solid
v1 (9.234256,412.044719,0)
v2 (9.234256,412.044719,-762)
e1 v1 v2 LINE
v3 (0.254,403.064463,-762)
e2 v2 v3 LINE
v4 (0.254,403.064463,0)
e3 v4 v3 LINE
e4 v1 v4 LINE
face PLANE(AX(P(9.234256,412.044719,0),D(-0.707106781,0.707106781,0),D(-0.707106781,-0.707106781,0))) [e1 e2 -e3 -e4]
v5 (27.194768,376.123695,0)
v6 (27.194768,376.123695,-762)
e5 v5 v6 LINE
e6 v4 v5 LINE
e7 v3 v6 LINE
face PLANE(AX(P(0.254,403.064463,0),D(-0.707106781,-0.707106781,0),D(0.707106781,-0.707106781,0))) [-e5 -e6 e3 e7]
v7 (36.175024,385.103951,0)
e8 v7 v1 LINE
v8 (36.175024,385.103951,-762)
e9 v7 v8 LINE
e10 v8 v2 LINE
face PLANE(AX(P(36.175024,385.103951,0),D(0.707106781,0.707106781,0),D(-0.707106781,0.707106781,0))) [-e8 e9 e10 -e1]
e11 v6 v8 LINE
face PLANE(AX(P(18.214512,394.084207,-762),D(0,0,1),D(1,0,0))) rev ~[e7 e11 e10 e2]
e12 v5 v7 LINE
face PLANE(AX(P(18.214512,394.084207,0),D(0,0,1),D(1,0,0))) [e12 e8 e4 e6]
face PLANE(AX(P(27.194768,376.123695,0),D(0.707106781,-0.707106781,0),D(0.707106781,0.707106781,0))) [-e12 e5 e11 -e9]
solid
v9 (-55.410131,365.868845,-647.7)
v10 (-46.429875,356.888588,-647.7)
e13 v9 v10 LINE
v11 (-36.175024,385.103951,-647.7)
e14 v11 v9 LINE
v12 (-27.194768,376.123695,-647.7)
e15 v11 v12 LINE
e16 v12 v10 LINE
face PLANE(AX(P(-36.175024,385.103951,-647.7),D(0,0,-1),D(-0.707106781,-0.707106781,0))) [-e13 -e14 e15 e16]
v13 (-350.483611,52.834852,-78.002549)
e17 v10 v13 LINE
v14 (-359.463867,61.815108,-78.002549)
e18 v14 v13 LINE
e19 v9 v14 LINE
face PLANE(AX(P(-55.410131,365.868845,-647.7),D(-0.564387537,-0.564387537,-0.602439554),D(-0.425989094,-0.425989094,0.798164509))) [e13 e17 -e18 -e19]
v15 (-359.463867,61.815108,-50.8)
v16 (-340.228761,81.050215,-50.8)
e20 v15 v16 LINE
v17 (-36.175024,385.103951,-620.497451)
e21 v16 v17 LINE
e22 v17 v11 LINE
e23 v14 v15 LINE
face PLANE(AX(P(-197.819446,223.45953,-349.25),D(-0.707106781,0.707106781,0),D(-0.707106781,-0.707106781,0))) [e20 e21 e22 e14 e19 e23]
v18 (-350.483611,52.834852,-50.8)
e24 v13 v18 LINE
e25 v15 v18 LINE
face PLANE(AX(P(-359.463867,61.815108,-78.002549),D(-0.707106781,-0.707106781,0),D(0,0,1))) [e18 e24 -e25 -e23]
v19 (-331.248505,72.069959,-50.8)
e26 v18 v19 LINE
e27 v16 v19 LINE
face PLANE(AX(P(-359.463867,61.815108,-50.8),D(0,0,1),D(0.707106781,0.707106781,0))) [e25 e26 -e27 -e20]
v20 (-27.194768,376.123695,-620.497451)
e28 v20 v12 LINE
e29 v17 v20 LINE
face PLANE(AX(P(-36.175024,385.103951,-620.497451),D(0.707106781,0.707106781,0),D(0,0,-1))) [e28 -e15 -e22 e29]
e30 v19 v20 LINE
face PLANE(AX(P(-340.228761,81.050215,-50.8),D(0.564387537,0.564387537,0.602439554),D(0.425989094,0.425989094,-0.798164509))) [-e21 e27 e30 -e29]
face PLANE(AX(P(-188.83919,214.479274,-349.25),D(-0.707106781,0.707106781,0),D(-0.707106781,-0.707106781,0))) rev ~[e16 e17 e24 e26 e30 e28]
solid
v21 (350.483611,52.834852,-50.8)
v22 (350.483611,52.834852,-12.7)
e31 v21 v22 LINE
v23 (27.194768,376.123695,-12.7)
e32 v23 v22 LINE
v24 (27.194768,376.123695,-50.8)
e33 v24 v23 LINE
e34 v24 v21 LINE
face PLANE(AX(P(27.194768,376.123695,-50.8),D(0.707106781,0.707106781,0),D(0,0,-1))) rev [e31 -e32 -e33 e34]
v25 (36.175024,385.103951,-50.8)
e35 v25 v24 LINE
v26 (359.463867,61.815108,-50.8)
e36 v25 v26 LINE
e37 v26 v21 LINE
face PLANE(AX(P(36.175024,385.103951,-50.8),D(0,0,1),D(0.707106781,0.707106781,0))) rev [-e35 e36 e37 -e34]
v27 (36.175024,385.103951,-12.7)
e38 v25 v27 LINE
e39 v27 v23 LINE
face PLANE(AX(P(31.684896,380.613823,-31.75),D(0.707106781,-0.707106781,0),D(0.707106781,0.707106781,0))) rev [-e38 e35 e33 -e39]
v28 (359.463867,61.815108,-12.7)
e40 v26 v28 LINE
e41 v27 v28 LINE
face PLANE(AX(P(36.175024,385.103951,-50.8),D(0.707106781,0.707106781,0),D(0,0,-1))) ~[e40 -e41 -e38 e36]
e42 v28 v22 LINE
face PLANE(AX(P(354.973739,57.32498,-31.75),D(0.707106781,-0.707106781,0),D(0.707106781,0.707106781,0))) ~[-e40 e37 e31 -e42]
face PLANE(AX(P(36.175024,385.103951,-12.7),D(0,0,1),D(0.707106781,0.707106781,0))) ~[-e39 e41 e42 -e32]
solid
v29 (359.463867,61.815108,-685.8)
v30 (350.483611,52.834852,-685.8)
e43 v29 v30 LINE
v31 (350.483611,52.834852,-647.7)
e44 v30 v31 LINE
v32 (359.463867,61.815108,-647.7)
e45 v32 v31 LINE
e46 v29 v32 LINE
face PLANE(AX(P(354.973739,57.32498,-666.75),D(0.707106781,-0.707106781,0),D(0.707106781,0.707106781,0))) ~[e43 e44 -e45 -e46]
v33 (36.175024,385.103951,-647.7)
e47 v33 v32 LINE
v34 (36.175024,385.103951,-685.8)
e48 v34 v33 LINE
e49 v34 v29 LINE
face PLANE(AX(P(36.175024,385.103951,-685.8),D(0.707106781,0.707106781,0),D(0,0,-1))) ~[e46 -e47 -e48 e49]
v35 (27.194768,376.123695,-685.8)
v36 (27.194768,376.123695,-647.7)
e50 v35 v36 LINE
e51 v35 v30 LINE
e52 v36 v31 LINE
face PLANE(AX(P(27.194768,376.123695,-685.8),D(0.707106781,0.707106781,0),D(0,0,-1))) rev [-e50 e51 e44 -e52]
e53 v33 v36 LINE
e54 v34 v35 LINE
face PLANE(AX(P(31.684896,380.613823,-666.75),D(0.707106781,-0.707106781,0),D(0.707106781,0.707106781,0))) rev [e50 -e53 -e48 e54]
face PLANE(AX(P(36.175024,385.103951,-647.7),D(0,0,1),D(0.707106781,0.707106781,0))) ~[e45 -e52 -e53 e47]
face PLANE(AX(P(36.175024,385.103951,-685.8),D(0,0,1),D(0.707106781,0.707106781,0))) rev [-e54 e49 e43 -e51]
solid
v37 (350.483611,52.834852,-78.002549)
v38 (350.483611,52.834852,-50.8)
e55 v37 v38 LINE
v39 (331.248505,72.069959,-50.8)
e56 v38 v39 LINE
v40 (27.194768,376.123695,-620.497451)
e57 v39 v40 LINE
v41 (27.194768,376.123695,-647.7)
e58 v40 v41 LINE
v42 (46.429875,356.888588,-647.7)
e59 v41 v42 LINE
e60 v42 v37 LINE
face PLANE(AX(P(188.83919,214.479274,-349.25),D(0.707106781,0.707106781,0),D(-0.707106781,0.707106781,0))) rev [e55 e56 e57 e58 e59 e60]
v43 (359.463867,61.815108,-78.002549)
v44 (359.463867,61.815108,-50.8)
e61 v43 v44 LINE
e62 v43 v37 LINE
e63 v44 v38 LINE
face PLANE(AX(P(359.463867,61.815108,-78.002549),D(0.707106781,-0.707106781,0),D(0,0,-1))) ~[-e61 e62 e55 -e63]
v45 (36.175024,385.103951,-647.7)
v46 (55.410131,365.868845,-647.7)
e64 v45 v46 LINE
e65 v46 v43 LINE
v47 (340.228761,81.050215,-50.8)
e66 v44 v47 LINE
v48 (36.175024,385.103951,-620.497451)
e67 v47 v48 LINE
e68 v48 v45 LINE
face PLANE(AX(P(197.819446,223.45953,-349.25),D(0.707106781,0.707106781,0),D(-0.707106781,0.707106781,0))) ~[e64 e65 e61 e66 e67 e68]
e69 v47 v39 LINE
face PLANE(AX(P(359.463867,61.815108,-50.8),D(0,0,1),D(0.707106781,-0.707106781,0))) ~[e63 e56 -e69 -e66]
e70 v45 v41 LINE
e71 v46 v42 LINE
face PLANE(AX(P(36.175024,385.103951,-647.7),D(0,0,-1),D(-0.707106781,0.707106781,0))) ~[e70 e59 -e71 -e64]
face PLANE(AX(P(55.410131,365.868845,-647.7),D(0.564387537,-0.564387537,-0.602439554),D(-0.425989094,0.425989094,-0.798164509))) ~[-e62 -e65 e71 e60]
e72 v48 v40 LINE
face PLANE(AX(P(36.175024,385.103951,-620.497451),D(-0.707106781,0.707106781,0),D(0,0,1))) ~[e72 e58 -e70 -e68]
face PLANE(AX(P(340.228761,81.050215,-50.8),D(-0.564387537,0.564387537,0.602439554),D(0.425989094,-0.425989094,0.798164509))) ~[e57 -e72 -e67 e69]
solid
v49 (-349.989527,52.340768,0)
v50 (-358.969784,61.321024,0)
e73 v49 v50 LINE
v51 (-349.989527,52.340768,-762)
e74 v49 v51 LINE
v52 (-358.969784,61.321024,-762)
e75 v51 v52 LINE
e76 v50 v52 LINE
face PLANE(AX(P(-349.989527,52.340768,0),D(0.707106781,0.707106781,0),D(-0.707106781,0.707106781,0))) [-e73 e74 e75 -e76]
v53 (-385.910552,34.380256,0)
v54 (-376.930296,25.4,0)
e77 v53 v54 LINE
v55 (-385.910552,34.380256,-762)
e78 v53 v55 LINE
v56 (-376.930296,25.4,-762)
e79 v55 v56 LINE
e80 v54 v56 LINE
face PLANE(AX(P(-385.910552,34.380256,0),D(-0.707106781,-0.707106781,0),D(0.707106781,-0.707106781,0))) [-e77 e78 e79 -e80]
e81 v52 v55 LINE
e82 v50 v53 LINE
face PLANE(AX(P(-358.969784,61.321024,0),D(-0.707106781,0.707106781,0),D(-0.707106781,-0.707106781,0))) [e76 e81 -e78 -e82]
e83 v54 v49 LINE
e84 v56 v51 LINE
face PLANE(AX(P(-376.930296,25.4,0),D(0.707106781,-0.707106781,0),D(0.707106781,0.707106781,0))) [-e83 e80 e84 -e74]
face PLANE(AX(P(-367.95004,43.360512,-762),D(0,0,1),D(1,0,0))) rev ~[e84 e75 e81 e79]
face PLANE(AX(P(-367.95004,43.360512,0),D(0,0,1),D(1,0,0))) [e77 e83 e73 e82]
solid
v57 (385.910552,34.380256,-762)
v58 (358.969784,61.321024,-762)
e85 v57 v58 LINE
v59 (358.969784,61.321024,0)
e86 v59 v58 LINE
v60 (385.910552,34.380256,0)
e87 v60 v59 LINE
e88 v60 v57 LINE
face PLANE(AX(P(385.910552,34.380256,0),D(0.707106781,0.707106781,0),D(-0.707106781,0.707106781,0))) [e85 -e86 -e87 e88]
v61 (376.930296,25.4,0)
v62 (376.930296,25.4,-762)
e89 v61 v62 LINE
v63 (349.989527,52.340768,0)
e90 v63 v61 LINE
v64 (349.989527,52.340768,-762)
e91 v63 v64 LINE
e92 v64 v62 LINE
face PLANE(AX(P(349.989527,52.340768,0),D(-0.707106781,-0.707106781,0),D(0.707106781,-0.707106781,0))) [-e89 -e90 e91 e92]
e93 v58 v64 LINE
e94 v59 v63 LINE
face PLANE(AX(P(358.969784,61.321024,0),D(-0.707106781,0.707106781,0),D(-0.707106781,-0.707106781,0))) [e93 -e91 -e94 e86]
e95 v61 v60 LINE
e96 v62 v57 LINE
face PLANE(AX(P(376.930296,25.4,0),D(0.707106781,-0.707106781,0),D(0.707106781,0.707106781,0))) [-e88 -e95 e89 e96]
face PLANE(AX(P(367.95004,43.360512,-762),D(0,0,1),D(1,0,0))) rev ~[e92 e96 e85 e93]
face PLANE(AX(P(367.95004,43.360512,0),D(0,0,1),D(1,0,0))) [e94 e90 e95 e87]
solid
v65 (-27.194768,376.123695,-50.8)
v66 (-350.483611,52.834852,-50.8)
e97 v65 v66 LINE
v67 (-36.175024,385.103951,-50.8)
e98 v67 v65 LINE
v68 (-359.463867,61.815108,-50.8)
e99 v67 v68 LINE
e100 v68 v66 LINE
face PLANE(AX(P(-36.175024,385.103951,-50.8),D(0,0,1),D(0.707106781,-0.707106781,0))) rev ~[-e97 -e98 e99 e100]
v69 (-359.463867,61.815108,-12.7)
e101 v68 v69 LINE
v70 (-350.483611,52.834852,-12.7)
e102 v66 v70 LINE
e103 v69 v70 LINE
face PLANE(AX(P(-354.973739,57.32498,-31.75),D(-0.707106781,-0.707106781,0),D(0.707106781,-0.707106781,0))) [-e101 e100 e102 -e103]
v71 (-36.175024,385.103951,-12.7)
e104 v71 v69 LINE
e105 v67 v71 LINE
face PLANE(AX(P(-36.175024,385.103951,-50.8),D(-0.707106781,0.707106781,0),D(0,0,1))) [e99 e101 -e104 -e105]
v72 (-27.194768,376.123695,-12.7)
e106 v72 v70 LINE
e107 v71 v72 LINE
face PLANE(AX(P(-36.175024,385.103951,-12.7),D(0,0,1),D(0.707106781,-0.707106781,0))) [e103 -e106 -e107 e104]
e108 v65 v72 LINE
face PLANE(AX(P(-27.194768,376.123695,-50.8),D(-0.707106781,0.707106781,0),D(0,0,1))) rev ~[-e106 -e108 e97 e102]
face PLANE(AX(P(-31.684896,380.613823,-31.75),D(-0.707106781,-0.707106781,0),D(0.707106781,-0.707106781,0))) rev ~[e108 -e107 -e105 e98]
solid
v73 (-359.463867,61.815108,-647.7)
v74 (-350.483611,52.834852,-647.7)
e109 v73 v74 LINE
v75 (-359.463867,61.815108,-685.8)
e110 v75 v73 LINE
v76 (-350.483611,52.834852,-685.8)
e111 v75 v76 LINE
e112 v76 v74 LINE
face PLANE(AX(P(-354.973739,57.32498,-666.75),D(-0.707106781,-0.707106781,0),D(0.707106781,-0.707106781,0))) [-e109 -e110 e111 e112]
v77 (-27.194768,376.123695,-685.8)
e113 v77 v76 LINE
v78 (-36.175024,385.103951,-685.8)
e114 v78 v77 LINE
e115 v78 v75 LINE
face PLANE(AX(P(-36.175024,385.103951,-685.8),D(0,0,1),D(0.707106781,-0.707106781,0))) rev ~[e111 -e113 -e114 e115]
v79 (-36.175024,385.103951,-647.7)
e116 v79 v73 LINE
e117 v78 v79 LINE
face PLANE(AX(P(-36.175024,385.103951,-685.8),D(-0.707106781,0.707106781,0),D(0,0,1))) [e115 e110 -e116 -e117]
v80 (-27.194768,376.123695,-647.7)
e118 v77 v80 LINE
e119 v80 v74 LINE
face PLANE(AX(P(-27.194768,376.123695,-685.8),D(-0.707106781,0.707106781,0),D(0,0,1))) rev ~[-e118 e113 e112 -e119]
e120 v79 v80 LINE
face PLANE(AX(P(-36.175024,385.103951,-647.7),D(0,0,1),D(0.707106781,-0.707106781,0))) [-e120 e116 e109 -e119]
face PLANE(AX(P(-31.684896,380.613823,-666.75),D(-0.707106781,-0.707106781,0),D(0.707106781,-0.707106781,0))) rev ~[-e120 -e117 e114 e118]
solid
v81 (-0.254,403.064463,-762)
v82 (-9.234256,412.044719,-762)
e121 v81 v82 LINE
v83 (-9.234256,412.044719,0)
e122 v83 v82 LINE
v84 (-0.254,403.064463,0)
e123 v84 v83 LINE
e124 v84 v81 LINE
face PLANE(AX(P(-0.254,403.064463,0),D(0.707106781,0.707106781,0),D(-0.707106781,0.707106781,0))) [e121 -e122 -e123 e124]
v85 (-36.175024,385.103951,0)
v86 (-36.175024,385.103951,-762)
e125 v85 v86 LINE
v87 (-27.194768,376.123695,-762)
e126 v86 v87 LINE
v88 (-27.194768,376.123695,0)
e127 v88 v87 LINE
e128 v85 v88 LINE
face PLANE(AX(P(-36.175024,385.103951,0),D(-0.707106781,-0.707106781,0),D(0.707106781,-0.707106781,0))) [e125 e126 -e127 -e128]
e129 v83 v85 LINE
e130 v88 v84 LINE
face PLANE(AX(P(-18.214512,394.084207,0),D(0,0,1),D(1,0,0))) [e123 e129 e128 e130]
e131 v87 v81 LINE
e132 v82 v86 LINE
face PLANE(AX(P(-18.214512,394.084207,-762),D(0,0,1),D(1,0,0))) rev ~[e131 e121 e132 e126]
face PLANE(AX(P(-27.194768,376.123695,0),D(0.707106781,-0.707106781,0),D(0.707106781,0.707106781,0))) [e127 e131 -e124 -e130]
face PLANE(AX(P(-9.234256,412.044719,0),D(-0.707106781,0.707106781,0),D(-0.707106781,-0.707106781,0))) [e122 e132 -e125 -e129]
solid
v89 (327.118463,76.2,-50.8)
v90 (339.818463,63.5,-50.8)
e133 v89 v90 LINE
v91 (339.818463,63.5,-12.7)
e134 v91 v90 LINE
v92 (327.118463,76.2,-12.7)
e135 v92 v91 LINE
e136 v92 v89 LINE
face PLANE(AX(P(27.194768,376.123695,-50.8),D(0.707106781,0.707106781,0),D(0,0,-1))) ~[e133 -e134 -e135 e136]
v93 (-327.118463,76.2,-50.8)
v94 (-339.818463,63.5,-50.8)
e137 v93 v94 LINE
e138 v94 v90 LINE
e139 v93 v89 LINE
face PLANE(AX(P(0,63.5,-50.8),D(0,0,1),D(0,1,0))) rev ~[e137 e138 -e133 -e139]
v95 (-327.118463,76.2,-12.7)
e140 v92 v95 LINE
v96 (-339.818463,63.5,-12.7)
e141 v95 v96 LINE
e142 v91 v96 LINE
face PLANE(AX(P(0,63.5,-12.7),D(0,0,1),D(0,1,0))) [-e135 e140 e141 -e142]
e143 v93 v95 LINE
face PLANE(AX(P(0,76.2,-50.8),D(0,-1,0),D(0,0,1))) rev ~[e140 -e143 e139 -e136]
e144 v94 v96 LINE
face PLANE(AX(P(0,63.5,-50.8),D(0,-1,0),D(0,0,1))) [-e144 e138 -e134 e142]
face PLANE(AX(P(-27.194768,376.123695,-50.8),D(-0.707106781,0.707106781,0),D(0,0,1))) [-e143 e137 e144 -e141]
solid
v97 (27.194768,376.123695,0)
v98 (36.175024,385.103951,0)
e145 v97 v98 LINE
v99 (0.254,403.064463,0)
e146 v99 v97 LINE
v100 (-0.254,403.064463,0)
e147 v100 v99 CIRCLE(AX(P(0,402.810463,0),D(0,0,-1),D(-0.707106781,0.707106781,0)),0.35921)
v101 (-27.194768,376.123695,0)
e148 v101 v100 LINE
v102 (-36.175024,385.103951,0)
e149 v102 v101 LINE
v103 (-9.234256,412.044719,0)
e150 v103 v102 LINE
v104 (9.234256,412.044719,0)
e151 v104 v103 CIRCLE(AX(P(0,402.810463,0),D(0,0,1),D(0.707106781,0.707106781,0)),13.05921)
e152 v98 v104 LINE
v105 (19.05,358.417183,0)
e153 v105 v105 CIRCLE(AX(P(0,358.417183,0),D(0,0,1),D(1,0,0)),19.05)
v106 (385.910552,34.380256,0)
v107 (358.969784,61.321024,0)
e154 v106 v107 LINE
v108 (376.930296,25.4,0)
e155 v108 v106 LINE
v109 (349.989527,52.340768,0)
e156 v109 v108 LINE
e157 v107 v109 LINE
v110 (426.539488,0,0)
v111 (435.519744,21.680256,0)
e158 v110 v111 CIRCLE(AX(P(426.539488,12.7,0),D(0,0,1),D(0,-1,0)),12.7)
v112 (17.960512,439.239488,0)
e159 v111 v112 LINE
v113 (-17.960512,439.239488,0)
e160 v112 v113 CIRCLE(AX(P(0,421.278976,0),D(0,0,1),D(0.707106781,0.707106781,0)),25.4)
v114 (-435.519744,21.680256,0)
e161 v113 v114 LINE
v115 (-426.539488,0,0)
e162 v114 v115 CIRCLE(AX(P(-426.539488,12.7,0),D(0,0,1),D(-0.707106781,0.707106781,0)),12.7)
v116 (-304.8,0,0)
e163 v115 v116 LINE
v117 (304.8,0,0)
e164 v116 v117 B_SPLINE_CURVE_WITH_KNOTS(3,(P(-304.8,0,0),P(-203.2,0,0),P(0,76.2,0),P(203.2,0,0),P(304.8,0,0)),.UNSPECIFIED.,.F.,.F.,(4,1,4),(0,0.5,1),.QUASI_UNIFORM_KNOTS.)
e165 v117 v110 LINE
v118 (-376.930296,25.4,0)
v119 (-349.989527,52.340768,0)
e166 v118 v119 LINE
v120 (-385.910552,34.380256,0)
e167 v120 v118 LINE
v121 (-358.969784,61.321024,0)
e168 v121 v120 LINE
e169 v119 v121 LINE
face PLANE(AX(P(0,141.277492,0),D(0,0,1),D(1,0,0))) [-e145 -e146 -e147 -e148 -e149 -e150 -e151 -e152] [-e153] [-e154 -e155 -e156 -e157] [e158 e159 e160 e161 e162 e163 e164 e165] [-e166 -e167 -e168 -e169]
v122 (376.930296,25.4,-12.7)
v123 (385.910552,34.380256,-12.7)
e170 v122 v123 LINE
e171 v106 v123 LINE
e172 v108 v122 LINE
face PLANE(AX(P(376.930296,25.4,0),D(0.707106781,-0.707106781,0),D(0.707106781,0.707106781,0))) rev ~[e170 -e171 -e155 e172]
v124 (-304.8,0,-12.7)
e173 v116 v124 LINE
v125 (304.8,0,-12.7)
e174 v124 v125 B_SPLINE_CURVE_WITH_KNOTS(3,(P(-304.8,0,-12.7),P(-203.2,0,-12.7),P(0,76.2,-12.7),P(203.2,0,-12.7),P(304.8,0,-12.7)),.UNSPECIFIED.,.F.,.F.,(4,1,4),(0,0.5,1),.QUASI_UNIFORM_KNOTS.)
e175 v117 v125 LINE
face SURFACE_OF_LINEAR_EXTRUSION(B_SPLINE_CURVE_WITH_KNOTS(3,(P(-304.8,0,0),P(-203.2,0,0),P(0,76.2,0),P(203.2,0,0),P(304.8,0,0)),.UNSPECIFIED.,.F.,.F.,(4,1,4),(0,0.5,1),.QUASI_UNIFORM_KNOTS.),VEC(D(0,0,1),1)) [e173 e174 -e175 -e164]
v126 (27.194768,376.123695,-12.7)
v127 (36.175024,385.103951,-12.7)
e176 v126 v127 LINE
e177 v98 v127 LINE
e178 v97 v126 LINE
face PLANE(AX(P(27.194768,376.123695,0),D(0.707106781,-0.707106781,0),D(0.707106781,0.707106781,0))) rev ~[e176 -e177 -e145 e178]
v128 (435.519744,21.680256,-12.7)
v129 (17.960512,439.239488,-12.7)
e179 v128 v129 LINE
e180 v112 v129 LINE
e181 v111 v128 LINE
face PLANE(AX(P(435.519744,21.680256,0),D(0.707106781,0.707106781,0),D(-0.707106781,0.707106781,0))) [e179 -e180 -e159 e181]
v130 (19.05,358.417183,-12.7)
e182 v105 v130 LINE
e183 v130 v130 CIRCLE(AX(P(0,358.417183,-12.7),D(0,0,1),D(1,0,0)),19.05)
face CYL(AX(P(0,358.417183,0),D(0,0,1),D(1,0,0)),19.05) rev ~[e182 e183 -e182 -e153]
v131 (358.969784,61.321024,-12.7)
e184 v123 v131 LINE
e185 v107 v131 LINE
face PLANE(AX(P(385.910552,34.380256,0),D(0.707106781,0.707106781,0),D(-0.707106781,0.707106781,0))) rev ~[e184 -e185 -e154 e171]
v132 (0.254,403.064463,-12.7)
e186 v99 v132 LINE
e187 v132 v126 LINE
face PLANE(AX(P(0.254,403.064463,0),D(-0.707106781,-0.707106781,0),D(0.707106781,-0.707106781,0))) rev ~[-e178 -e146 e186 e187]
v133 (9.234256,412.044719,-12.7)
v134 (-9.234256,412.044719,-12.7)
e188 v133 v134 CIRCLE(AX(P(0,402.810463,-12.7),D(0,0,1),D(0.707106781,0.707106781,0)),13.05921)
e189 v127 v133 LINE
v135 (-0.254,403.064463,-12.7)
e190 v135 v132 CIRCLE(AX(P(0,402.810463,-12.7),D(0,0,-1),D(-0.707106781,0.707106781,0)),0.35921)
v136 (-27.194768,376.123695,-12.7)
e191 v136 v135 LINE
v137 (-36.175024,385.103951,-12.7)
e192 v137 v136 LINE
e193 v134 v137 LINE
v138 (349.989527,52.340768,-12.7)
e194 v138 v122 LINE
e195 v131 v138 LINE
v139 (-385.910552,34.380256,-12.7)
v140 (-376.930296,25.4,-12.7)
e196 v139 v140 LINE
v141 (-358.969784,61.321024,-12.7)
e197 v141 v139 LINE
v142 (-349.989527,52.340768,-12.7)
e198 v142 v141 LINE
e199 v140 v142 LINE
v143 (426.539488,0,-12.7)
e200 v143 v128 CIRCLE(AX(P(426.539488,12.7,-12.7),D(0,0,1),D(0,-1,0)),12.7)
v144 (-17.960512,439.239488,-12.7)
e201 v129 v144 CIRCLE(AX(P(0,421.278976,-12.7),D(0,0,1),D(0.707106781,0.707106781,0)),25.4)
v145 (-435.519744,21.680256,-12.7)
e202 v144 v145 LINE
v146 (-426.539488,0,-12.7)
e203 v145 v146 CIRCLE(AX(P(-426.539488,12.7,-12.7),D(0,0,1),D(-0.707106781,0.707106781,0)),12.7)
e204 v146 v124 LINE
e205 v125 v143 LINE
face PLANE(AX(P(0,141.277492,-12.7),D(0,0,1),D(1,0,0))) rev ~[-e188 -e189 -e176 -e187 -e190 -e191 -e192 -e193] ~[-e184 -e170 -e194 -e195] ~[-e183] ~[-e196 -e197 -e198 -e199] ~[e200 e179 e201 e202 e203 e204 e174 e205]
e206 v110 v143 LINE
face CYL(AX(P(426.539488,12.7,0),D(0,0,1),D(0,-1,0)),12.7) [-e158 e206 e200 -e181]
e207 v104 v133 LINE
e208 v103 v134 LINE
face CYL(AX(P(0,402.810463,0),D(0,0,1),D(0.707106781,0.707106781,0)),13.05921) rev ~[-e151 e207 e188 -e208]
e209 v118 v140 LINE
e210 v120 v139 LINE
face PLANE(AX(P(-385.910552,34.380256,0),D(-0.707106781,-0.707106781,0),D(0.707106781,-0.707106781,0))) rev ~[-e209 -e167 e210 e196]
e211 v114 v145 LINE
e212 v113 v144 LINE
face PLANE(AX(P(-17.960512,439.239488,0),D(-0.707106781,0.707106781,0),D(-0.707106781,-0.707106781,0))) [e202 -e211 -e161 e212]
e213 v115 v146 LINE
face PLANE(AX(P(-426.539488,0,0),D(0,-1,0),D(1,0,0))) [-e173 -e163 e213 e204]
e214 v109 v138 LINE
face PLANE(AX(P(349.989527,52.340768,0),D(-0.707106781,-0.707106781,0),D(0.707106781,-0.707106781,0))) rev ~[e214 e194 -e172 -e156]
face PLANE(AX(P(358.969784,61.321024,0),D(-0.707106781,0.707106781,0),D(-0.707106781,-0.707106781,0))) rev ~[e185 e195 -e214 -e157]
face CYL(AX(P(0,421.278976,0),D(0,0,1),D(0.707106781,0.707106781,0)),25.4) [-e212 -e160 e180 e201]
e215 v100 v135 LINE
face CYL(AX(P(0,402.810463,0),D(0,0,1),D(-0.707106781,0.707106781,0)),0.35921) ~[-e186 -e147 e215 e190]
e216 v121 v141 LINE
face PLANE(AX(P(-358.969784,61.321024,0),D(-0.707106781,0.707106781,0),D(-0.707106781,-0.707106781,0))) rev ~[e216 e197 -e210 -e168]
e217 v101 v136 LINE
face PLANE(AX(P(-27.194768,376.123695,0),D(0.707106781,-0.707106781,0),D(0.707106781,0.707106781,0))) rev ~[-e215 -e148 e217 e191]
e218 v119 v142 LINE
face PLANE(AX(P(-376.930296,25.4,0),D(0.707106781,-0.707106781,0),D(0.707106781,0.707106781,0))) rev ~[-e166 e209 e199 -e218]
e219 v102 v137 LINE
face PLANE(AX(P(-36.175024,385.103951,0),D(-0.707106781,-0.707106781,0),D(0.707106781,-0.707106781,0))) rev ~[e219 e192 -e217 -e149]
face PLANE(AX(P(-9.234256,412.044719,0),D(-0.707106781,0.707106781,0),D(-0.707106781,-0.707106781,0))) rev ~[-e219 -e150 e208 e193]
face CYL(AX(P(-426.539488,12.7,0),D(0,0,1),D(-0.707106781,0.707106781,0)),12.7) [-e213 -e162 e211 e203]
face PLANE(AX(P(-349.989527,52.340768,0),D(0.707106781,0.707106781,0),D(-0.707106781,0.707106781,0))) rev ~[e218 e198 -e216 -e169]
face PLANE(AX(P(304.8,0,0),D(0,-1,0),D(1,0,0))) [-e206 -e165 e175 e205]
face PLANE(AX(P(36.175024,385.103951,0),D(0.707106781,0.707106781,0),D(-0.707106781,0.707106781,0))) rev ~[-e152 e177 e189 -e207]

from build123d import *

# Parameters (mm, degrees)
F3_DEPTH  = 12.7
F2_R      = 19.05
F4_DEPTH  = 12.7
F5_DEPTH  = 762
F6_W      = 12.7
F6_H      = 38.1
F7_DEPTH  = 457.1994660567
F9_DEPTH  = 12.7
F11_W     = 12.7
F11_H     = 38.1
F12_REACH = 479.401414142
F13_REACH = 479.401414142


with BuildPart() as f3:
    # F1 (on Top) → F3 (new body)
    with BuildSketch(Plane.XY):
        with BuildLine():
            Line((435.5197438789, 21.6802561211), (17.9605122421, 439.2394877579))
            ThreePointArc((17.9605122421, 439.2394877579), (0, 446.6789755157), (-17.9605122421, 439.2394877579))
            Line((-17.9605122421, 439.2394877579), (-435.5197438789, 21.6802561211))
            ThreePointArc((-435.5197438789, 21.6802561211), (-438.2727578208, 7.839920409), (-426.5394877579, 0))
            Line((-426.5394877579, 0), (-304.8, 0))
            add(Edge.make_bspline(
                [(-304.8, 0), (-203.2, 0), (0, 76.2), (203.2, 0), (304.8, 0)],
                knots=[0, 0, 0, 0, 0.5, 1, 1, 1, 1], degree=3))
            Line((304.8, 0), (426.5394877579, 0))
            ThreePointArc((426.5394877579, 0), (438.2727578208, 7.839920409), (435.5197438789, 21.6802561211))
        make_face()
    extrude(amount=-F3_DEPTH)

    # F2 (on Top) → F4 (cut, through all)
    with BuildSketch(Plane.XY):
        Polygon((-27.1947683632, 376.1236949104), (-0.254, 403.0644632736), (-9.2342561211, 412.0447193947), (-36.1750244843, 385.1039510314), align=None)
        with BuildLine():
            Line((-9.2342561211, 412.0447193947), (-0.254, 403.0644632736))
            ThreePointArc((-0.254, 403.0644632736), (0, 403.1696735184), (0.254, 403.0644632736))
            Line((0.254, 403.0644632736), (9.2342561211, 412.0447193947))
            ThreePointArc((9.2342561211, 412.0447193947), (0, 415.8696735184), (-9.2342561211, 412.0447193947))
        make_face()
        Polygon((9.2342561211, 412.0447193947), (0.254, 403.0644632736), (27.1947683632, 376.1236949104), (36.1750244843, 385.1039510314), align=None)
        Polygon((-358.9697835442, 61.3210244843), (-385.9105519074, 34.3802561211), (-376.9302957863, 25.4), (-349.9895274231, 52.3407683632), align=None)
        Polygon((358.9697835442, 61.3210244843), (349.9895274231, 52.3407683632), (376.9302957863, 25.4), (385.9105519074, 34.3802561211), align=None)
        with Locations((0, 358.4171826682)):
            Circle(F2_R)
    extrude(amount=-F4_DEPTH, mode=Mode.SUBTRACT)


with BuildPart() as f5:
    # F2 (on Top) → F5 (new body)
    with BuildSketch(Plane.XY):
        Polygon((-358.9697835442, 61.3210244843), (-385.9105519074, 34.3802561211), (-376.9302957863, 25.4), (-349.9895274231, 52.3407683632), align=None)
    extrude(amount=-F5_DEPTH)


with BuildPart() as f5b:
    # F2 (on Top) → F5, piece 2 (new body)
    with BuildSketch(Plane.XY):
        Polygon((358.9697835442, 61.3210244843), (349.9895274231, 52.3407683632), (376.9302957863, 25.4), (385.9105519074, 34.3802561211), align=None)
    extrude(amount=-F5_DEPTH)


with BuildPart() as f5c:
    # F2 (on Top) → F5, piece 3 (new body)
    with BuildSketch(Plane.XY):
        Polygon((9.2342561211, 412.0447193947), (0.254, 403.0644632736), (27.1947683632, 376.1236949104), (36.1750244843, 385.1039510314), align=None)
    extrude(amount=-F5_DEPTH)


with BuildPart() as f5d:
    # F2 (on Top) → F5, piece 4 (new body)
    with BuildSketch(Plane.XY):
        Polygon((-27.1947683632, 376.1236949104), (-0.254, 403.0644632736), (-9.2342561211, 412.0447193947), (-36.1750244843, 385.1039510314), align=None)
    extrude(amount=-F5_DEPTH)


with BuildPart() as f7:
    # F6 (on face) → F7 (new body, through all)
    with BuildSketch(Plane(origin=(174.4644632736, 174.4644632736, 0), x_dir=(0.7071067812, -0.7071067812, 0), z_dir=(-0.7071067812, -0.7071067812, 0))):
        with Locations((-291.5392203585, -31.75)):
            Rectangle(F6_W, F6_H)
    extrude(amount=F7_DEPTH)


with BuildPart() as f7b:
    # F6 (on face) → F7, piece 2 (new body, through all)
    with BuildSketch(Plane(origin=(174.4644632736, 174.4644632736, 0), x_dir=(0.7071067812, -0.7071067812, 0), z_dir=(-0.7071067812, -0.7071067812, 0))):
        with Locations((-291.5392203585, -666.75)):
            Rectangle(F6_W, F6_H)
    extrude(amount=F7_DEPTH)


with BuildPart() as f9:
    # F8 (on face) → F9 (new body)
    with BuildSketch(Plane(origin=(-210.6394877579, 210.6394877579, 0), x_dir=(-0.7071067812, -0.7071067812, 0), z_dir=(-0.7071067812, 0.7071067812, 0))):
        Polygon((210.469455943, -78.0025485289), (210.469455943, -50.8), (183.2669074141, -50.8), (-246.7300101136, -620.4974514711), (-246.7300101136, -647.7), (-219.5274615847, -647.7), align=None)
    extrude(amount=-F9_DEPTH)


with BuildPart() as f10_1:
    # F10: instance of F7b
    add(f7b.part.mirror(Plane.YZ))


with BuildPart() as f10_2:
    # F10: instance of F7
    add(f7.part.mirror(Plane.YZ))


with BuildPart() as f10_3:
    # F10: instance of F9
    add(f9.part.mirror(Plane.YZ))


with BuildPart() as f12:
    f12_end = f7.part.faces().sort_by_distance((-188.839189765, 214.4792735086, -31.75))[0]
    # F11 (on Right) → F12 (new body, up to a face of F7 that its end follows)
    with BuildSketch(Plane.YZ):
        with Locations((69.85, -31.75)):
            Rectangle(F11_W, F11_H)
    f12_long = extrude(amount=-F12_REACH, mode=Mode.PRIVATE)
    add(split(f12_long, bisect_by=f12_end, keep=Keep.TOP, mode=Mode.PRIVATE))

    f13_end = f10_2.part.faces().sort_by_distance((188.839189765, 214.4792735086, -31.75))[0]
    # F11 (on Right) → F13 (join, up to a face of F10_2 that its end follows)
    with BuildSketch(Plane.YZ):
        with Locations((69.85, -31.75)):
            Rectangle(F11_W, F11_H)
    f13_long = extrude(amount=F13_REACH, mode=Mode.PRIVATE)
    add(split(f13_long, bisect_by=f13_end, keep=Keep.TOP, mode=Mode.PRIVATE))


solid = Compound([f3.part, f5.part, f5b.part, f5c.part, f5d.part, f7.part, f7b.part, f9.part, f10_1.part, f10_2.part, f10_3.part, f12.part])
